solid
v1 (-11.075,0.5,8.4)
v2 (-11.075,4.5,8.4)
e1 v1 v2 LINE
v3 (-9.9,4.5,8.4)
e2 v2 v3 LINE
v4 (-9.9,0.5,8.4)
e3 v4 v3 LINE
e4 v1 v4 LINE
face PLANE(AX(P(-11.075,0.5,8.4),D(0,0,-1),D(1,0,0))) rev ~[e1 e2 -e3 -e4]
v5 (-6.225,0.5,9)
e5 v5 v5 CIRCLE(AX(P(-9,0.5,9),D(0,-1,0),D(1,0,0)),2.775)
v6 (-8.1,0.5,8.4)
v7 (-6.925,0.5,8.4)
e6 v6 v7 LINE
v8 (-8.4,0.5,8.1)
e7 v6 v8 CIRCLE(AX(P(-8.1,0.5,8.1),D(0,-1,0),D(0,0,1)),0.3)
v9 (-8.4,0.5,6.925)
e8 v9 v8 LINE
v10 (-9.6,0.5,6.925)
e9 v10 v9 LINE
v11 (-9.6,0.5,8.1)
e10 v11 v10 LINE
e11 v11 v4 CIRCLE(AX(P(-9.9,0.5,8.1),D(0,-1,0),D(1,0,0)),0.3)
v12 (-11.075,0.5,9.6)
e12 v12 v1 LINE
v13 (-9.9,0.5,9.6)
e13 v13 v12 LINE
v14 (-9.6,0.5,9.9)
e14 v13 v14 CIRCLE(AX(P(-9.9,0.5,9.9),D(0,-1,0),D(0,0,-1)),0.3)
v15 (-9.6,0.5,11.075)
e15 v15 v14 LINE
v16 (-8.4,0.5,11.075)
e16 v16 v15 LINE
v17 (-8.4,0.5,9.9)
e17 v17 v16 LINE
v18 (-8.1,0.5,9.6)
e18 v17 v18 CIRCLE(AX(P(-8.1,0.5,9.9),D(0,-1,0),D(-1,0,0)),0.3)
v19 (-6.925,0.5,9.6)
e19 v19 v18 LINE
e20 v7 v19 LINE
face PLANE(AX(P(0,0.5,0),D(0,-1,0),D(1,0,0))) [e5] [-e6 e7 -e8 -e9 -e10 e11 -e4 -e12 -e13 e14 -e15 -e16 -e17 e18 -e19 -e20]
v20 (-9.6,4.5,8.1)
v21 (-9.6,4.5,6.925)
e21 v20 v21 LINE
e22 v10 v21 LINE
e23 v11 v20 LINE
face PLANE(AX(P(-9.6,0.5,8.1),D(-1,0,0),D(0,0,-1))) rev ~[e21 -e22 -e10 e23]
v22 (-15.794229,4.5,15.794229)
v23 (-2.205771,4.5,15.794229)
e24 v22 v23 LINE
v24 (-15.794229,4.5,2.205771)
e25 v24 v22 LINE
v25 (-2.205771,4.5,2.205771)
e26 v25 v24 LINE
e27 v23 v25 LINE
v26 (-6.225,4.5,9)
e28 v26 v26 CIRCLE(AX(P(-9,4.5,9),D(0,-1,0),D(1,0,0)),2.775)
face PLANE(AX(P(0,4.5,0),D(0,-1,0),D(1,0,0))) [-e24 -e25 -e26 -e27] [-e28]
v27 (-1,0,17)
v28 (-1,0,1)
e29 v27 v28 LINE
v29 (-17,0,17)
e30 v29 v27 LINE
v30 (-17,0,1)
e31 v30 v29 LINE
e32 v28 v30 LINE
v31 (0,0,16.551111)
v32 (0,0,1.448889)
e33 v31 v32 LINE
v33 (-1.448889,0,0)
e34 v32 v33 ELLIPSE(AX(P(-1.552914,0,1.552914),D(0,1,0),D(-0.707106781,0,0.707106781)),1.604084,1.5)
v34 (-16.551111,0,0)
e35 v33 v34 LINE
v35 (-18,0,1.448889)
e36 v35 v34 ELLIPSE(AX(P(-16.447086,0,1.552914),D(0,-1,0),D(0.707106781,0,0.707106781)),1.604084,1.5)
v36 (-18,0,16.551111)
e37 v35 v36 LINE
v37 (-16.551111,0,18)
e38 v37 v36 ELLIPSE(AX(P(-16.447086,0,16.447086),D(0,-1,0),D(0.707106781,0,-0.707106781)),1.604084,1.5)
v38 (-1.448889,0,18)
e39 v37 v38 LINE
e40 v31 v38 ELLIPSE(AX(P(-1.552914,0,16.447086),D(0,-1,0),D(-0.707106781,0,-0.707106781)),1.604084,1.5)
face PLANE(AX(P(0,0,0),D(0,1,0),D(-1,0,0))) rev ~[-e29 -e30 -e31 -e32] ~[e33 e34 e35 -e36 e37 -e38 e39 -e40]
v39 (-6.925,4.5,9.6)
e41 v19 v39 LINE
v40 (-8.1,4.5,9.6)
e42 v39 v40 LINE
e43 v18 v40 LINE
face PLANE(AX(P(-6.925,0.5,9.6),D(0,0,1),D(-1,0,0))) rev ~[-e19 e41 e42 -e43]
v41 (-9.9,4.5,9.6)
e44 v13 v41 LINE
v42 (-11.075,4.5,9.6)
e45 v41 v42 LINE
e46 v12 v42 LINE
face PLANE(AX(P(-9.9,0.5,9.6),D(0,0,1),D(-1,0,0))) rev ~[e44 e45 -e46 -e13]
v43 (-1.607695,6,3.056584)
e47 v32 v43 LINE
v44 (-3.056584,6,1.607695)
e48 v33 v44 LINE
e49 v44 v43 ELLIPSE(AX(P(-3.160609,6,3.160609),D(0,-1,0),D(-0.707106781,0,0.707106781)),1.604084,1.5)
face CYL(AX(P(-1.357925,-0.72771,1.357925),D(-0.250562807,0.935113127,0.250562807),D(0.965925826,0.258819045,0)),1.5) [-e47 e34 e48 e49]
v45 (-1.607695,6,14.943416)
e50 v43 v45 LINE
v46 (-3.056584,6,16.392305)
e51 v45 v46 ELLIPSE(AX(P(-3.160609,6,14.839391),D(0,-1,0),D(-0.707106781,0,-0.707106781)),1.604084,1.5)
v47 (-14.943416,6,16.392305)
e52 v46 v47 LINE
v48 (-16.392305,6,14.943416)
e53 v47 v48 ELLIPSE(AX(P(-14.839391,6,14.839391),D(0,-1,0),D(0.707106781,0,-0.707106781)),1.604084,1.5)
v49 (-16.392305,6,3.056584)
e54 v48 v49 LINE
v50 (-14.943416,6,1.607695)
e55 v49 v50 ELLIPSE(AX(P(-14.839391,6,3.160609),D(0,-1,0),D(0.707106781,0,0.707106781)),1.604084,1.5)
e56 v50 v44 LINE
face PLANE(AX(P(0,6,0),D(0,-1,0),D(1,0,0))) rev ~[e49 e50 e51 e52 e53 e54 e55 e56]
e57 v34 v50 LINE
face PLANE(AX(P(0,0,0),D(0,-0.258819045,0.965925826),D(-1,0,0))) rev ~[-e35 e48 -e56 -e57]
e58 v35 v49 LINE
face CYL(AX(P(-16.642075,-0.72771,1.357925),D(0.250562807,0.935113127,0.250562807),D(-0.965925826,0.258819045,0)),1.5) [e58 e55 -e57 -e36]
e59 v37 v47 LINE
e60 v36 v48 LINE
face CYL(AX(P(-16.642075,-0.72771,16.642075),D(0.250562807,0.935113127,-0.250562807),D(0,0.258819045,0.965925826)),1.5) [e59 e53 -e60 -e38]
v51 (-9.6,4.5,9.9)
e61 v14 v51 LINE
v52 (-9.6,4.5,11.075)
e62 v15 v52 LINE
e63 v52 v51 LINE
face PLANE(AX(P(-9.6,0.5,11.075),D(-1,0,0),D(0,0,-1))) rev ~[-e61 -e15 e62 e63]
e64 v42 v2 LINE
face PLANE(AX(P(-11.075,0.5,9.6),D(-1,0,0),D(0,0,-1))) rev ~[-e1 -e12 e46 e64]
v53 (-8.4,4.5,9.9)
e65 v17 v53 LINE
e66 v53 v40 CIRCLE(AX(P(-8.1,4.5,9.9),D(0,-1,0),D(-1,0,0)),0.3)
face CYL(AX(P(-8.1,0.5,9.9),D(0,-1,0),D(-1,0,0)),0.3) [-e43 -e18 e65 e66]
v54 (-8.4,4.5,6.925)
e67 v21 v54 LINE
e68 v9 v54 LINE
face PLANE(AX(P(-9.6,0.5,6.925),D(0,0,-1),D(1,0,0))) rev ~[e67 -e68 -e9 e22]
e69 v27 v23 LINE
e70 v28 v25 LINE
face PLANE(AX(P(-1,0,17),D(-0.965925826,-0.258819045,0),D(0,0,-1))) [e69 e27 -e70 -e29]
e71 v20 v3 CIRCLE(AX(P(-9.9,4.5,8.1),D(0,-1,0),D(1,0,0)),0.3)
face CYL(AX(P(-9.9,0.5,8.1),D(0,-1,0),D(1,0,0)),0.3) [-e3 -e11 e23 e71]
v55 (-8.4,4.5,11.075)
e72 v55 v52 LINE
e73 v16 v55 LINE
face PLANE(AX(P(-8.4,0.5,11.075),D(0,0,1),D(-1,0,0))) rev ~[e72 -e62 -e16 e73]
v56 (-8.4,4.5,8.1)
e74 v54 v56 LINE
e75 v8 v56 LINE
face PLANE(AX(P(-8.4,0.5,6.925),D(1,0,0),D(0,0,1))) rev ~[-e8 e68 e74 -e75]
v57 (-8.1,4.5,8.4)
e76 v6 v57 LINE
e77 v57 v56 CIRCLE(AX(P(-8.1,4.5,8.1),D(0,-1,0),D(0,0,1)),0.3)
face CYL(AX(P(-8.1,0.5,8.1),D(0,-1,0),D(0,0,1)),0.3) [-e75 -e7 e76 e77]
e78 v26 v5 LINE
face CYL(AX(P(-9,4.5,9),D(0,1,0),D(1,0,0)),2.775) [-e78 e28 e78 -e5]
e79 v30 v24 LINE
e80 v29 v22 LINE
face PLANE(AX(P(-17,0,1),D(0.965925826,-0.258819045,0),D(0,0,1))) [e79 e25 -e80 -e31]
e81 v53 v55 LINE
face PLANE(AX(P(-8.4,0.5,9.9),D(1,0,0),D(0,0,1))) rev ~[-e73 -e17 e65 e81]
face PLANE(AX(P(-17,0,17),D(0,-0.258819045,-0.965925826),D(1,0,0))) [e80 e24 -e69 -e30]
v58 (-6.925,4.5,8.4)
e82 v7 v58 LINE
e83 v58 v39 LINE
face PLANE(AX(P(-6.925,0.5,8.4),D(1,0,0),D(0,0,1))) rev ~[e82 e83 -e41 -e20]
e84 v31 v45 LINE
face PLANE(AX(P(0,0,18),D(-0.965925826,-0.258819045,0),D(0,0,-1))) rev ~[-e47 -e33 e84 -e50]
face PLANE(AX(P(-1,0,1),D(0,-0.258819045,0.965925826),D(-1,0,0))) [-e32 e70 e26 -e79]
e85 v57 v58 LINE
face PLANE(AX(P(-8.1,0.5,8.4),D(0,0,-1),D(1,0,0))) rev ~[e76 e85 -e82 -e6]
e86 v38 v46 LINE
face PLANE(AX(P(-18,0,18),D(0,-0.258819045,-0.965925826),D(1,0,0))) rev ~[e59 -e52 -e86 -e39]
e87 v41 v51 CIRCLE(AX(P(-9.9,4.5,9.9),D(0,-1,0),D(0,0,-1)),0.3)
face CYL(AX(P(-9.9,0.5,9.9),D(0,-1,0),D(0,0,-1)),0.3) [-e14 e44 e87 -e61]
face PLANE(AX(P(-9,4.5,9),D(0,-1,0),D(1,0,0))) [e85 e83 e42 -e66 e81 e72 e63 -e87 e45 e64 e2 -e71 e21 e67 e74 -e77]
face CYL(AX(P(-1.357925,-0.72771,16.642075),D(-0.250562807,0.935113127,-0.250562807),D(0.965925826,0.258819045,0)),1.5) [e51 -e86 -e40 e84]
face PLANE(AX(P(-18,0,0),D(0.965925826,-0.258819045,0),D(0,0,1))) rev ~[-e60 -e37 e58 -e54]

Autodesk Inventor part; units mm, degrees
ref_plane "YZ Plane" through (0, 0, 0) normal (1, 0, 0) x (0, 1, 0)
ref_plane "XZ Plane" through (0, 0, 0) normal (0, 1, 0) x (-1, 0, 0)
sketch "Sketch1" plane through (0, 0, 0) normal (0, 1, 0) x (-1, 0, 0)
  line L0 (0, 0) -> (18, 0)
  line L1 (18, 0) -> (18, 18)
  line L2 (18, 18) -> (0, 18)
  line L3 (0, 18) -> (0, 0)
  dimension "d0" = 18
  dimension "d1" = 18
extrude "Extrusion1" add sketch "Sketch1" along normal blind 8 draft -15
fillet "Fillet1" radius 1.5 8 edges at (-1.0718, 4, 16.9282) (-9, 8, 15.8564) (-2.1436, 8, 9) (-9, 8, 2.1436) (-1.0718, 4, 1.0718) (-16.9282, 4, 1.0718) (-16.9282, 4, 16.9282) (-15.8564, 8, 9)
ref_plane "Work Plane1" through (-9, 33.5885, 16.5511) normal (1, 0, 0) x (0, 0, -1)
sketch "Sketch2" plane through (-9, 33.5885, 16.5511) normal (1, 0, 0) x (0, 0, -1)
  line L0 (13.2565, -25.5885) -> (1.8457, -25.5885) projected
  arc A0 (14.7054, -26.7002) -> (13.2565, -25.5885) centre (13.2565, -27.0885) ccw projected
  arc A1 (1.8457, -25.5885) -> (13.2565, -25.5885) centre (7.5511, -8.5166) ccw
  point P0 (16.5511, -33.5885)
  point P1 (13.2565, -25.5885)
  dimension "d5" = 18
extrude "Extrusion2" cut sketch "Sketch2" along normal through all both and the other way through all
sketch "Sketch3" plane through (0, 0, 0) normal (0, -1, 0) x (1, 0, 0)
  line L0 (-16.5511, 18) -> (-1.4489, 18) construction
  line L1 (-9, 18) -> (-9, 0) construction
  line L2 (-1.4489, 0) -> (-16.5511, 0) construction
  line L3 (-18, 1.4489) -> (-18, 16.5511) construction
  line L4 (-18, 9) -> (0, 9) construction
  line L5 (-1, 1) -> (-17, 1)
  line L6 (-17, 1) -> (-17, 17)
  line L7 (-17, 17) -> (-1, 17)
  line L8 (-1, 17) -> (-1, 1)
  line L9 (-1, 1) -> (-17, 17) construction
  line L10 (-17, 1) -> (-1, 17) construction
  point P0 (0, 0)
  point P1 (-9, 9)
  point P2 (-9, 9)
  dimension "d8" = 16
  dimension "d9" = 16
extrude "Extrusion3" cut sketch "Sketch3" against normal blind 4.5 draft -15
sketch "Sketch4" plane through (0, 4.5, 0) normal (0, -1, 0) x (1, 0, 0)
  line L0 (-15.7942, 15.7942) -> (-15.7942, 2.2058) construction
  line L1 (-15.7942, 9) -> (-2.2058, 9) construction
  line L2 (-2.2058, 2.2058) -> (-2.2058, 15.7942) construction
  line L3 (-2.2058, 15.7942) -> (-15.7942, 15.7942) construction
  line L4 (-9, 15.7942) -> (-9, 2.2058) construction
  line L5 (-15.7942, 2.2058) -> (-2.2058, 2.2058) construction
  circle A0 centre (-9, 9) radius 2.775
  point P0 (0, 0)
  dimension "d12" = 5.55
extrude "Extrusion4" add sketch "Sketch4" along normal blind 4
sketch "Sketch5" plane through (-9, 0.5, 9) normal (0, -1, 0) x (1, 0, 0)
  line L0 (0.6, 2.075) -> (-0.6, 2.075)
  line L1 (-0.6, -2.075) -> (0.6, -2.075)
  line L2 (-0.6, 2.075) -> (0.6, -2.075) construction
  line L3 (-2.075, 0.6) -> (-2.075, -0.6)
  line L4 (2.075, -0.6) -> (2.075, 0.6)
  line L5 (2.075, 0.6) -> (-2.075, -0.6) construction
  line L6 (-2.075, 0.6) -> (2.075, -0.6) construction
  line L7 (-6.7942, 6.7942) -> (-6.7942, -6.7942) construction
  line L8 (-6.7942, 0) -> (6.7942, 0) construction
  line L9 (6.7942, -6.7942) -> (6.7942, 6.7942) construction
  line L10 (-6.7942, -6.7942) -> (6.7942, -6.7942) construction
  line L11 (0, -6.7942) -> (0, 6.7942) construction
  arc A0 (0.9, -0.6) -> (0.6, -0.9) centre (0.9, -0.9) ccw
  arc A1 (-0.6, -0.9) -> (-0.9, -0.6) centre (-0.9, -0.9) ccw
  arc A2 (0.6, 0.9) -> (0.9, 0.6) centre (0.9, 0.9) ccw
  arc A3 (-0.9, 0.6) -> (-0.6, 0.9) centre (-0.9, 0.9) ccw
  line L12 (-0.6, 2.075) -> (-0.6, 0.9)
  line L13 (-0.6, -0.9) -> (-0.6, -2.075)
  line L14 (-2.075, -0.6) -> (-0.9, -0.6)
  line L15 (-0.9, 0.6) -> (-2.075, 0.6)
  line L16 (0.6, 2.075) -> (0.1735, 0.6) construction
  line L17 (0, 0) -> (-0.6, -2.075) construction
  line L18 (2.075, 0.6) -> (0.9, 0.6)
  line L19 (0.9, -0.6) -> (2.075, -0.6)
  line L20 (0.6, -2.075) -> (0.6, -0.9)
  line L21 (0.6, 0.9) -> (0.6, 2.075)
  point P0 (9, -9)
  dimension "d15" = 1.2
  dimension "d16" = 4.15
  dimension "d17" = 4.15
  dimension "d18" = 1.2
  dimension "d19" = 0.3
extrude "Extrusion5" cut sketch "Sketch5" against normal blind 4
ref_plane "Work Plane3" through (0, 6, 0) normal (0, -1, 0) x (1, 0, 0)
split_face "Split1"
sketch "Sketch7" plane through (0, 6, 0) normal (0, -1, 0) x (1, 0, 0)
  line L0 (-25.6931, 27.6788) -> (12.1363, 27.6788)
  line L1 (12.1363, 27.6788) -> (12.1363, -37.3947)
  line L2 (12.1363, -37.3947) -> (-25.6931, -37.3947)
  line L3 (-25.6931, -37.3947) -> (-25.6931, 27.6788)
  point P0 (0, 0)
extrude "Extrusion7" cut sketch "Sketch7" against normal blind 10
properties part number "bottom"
